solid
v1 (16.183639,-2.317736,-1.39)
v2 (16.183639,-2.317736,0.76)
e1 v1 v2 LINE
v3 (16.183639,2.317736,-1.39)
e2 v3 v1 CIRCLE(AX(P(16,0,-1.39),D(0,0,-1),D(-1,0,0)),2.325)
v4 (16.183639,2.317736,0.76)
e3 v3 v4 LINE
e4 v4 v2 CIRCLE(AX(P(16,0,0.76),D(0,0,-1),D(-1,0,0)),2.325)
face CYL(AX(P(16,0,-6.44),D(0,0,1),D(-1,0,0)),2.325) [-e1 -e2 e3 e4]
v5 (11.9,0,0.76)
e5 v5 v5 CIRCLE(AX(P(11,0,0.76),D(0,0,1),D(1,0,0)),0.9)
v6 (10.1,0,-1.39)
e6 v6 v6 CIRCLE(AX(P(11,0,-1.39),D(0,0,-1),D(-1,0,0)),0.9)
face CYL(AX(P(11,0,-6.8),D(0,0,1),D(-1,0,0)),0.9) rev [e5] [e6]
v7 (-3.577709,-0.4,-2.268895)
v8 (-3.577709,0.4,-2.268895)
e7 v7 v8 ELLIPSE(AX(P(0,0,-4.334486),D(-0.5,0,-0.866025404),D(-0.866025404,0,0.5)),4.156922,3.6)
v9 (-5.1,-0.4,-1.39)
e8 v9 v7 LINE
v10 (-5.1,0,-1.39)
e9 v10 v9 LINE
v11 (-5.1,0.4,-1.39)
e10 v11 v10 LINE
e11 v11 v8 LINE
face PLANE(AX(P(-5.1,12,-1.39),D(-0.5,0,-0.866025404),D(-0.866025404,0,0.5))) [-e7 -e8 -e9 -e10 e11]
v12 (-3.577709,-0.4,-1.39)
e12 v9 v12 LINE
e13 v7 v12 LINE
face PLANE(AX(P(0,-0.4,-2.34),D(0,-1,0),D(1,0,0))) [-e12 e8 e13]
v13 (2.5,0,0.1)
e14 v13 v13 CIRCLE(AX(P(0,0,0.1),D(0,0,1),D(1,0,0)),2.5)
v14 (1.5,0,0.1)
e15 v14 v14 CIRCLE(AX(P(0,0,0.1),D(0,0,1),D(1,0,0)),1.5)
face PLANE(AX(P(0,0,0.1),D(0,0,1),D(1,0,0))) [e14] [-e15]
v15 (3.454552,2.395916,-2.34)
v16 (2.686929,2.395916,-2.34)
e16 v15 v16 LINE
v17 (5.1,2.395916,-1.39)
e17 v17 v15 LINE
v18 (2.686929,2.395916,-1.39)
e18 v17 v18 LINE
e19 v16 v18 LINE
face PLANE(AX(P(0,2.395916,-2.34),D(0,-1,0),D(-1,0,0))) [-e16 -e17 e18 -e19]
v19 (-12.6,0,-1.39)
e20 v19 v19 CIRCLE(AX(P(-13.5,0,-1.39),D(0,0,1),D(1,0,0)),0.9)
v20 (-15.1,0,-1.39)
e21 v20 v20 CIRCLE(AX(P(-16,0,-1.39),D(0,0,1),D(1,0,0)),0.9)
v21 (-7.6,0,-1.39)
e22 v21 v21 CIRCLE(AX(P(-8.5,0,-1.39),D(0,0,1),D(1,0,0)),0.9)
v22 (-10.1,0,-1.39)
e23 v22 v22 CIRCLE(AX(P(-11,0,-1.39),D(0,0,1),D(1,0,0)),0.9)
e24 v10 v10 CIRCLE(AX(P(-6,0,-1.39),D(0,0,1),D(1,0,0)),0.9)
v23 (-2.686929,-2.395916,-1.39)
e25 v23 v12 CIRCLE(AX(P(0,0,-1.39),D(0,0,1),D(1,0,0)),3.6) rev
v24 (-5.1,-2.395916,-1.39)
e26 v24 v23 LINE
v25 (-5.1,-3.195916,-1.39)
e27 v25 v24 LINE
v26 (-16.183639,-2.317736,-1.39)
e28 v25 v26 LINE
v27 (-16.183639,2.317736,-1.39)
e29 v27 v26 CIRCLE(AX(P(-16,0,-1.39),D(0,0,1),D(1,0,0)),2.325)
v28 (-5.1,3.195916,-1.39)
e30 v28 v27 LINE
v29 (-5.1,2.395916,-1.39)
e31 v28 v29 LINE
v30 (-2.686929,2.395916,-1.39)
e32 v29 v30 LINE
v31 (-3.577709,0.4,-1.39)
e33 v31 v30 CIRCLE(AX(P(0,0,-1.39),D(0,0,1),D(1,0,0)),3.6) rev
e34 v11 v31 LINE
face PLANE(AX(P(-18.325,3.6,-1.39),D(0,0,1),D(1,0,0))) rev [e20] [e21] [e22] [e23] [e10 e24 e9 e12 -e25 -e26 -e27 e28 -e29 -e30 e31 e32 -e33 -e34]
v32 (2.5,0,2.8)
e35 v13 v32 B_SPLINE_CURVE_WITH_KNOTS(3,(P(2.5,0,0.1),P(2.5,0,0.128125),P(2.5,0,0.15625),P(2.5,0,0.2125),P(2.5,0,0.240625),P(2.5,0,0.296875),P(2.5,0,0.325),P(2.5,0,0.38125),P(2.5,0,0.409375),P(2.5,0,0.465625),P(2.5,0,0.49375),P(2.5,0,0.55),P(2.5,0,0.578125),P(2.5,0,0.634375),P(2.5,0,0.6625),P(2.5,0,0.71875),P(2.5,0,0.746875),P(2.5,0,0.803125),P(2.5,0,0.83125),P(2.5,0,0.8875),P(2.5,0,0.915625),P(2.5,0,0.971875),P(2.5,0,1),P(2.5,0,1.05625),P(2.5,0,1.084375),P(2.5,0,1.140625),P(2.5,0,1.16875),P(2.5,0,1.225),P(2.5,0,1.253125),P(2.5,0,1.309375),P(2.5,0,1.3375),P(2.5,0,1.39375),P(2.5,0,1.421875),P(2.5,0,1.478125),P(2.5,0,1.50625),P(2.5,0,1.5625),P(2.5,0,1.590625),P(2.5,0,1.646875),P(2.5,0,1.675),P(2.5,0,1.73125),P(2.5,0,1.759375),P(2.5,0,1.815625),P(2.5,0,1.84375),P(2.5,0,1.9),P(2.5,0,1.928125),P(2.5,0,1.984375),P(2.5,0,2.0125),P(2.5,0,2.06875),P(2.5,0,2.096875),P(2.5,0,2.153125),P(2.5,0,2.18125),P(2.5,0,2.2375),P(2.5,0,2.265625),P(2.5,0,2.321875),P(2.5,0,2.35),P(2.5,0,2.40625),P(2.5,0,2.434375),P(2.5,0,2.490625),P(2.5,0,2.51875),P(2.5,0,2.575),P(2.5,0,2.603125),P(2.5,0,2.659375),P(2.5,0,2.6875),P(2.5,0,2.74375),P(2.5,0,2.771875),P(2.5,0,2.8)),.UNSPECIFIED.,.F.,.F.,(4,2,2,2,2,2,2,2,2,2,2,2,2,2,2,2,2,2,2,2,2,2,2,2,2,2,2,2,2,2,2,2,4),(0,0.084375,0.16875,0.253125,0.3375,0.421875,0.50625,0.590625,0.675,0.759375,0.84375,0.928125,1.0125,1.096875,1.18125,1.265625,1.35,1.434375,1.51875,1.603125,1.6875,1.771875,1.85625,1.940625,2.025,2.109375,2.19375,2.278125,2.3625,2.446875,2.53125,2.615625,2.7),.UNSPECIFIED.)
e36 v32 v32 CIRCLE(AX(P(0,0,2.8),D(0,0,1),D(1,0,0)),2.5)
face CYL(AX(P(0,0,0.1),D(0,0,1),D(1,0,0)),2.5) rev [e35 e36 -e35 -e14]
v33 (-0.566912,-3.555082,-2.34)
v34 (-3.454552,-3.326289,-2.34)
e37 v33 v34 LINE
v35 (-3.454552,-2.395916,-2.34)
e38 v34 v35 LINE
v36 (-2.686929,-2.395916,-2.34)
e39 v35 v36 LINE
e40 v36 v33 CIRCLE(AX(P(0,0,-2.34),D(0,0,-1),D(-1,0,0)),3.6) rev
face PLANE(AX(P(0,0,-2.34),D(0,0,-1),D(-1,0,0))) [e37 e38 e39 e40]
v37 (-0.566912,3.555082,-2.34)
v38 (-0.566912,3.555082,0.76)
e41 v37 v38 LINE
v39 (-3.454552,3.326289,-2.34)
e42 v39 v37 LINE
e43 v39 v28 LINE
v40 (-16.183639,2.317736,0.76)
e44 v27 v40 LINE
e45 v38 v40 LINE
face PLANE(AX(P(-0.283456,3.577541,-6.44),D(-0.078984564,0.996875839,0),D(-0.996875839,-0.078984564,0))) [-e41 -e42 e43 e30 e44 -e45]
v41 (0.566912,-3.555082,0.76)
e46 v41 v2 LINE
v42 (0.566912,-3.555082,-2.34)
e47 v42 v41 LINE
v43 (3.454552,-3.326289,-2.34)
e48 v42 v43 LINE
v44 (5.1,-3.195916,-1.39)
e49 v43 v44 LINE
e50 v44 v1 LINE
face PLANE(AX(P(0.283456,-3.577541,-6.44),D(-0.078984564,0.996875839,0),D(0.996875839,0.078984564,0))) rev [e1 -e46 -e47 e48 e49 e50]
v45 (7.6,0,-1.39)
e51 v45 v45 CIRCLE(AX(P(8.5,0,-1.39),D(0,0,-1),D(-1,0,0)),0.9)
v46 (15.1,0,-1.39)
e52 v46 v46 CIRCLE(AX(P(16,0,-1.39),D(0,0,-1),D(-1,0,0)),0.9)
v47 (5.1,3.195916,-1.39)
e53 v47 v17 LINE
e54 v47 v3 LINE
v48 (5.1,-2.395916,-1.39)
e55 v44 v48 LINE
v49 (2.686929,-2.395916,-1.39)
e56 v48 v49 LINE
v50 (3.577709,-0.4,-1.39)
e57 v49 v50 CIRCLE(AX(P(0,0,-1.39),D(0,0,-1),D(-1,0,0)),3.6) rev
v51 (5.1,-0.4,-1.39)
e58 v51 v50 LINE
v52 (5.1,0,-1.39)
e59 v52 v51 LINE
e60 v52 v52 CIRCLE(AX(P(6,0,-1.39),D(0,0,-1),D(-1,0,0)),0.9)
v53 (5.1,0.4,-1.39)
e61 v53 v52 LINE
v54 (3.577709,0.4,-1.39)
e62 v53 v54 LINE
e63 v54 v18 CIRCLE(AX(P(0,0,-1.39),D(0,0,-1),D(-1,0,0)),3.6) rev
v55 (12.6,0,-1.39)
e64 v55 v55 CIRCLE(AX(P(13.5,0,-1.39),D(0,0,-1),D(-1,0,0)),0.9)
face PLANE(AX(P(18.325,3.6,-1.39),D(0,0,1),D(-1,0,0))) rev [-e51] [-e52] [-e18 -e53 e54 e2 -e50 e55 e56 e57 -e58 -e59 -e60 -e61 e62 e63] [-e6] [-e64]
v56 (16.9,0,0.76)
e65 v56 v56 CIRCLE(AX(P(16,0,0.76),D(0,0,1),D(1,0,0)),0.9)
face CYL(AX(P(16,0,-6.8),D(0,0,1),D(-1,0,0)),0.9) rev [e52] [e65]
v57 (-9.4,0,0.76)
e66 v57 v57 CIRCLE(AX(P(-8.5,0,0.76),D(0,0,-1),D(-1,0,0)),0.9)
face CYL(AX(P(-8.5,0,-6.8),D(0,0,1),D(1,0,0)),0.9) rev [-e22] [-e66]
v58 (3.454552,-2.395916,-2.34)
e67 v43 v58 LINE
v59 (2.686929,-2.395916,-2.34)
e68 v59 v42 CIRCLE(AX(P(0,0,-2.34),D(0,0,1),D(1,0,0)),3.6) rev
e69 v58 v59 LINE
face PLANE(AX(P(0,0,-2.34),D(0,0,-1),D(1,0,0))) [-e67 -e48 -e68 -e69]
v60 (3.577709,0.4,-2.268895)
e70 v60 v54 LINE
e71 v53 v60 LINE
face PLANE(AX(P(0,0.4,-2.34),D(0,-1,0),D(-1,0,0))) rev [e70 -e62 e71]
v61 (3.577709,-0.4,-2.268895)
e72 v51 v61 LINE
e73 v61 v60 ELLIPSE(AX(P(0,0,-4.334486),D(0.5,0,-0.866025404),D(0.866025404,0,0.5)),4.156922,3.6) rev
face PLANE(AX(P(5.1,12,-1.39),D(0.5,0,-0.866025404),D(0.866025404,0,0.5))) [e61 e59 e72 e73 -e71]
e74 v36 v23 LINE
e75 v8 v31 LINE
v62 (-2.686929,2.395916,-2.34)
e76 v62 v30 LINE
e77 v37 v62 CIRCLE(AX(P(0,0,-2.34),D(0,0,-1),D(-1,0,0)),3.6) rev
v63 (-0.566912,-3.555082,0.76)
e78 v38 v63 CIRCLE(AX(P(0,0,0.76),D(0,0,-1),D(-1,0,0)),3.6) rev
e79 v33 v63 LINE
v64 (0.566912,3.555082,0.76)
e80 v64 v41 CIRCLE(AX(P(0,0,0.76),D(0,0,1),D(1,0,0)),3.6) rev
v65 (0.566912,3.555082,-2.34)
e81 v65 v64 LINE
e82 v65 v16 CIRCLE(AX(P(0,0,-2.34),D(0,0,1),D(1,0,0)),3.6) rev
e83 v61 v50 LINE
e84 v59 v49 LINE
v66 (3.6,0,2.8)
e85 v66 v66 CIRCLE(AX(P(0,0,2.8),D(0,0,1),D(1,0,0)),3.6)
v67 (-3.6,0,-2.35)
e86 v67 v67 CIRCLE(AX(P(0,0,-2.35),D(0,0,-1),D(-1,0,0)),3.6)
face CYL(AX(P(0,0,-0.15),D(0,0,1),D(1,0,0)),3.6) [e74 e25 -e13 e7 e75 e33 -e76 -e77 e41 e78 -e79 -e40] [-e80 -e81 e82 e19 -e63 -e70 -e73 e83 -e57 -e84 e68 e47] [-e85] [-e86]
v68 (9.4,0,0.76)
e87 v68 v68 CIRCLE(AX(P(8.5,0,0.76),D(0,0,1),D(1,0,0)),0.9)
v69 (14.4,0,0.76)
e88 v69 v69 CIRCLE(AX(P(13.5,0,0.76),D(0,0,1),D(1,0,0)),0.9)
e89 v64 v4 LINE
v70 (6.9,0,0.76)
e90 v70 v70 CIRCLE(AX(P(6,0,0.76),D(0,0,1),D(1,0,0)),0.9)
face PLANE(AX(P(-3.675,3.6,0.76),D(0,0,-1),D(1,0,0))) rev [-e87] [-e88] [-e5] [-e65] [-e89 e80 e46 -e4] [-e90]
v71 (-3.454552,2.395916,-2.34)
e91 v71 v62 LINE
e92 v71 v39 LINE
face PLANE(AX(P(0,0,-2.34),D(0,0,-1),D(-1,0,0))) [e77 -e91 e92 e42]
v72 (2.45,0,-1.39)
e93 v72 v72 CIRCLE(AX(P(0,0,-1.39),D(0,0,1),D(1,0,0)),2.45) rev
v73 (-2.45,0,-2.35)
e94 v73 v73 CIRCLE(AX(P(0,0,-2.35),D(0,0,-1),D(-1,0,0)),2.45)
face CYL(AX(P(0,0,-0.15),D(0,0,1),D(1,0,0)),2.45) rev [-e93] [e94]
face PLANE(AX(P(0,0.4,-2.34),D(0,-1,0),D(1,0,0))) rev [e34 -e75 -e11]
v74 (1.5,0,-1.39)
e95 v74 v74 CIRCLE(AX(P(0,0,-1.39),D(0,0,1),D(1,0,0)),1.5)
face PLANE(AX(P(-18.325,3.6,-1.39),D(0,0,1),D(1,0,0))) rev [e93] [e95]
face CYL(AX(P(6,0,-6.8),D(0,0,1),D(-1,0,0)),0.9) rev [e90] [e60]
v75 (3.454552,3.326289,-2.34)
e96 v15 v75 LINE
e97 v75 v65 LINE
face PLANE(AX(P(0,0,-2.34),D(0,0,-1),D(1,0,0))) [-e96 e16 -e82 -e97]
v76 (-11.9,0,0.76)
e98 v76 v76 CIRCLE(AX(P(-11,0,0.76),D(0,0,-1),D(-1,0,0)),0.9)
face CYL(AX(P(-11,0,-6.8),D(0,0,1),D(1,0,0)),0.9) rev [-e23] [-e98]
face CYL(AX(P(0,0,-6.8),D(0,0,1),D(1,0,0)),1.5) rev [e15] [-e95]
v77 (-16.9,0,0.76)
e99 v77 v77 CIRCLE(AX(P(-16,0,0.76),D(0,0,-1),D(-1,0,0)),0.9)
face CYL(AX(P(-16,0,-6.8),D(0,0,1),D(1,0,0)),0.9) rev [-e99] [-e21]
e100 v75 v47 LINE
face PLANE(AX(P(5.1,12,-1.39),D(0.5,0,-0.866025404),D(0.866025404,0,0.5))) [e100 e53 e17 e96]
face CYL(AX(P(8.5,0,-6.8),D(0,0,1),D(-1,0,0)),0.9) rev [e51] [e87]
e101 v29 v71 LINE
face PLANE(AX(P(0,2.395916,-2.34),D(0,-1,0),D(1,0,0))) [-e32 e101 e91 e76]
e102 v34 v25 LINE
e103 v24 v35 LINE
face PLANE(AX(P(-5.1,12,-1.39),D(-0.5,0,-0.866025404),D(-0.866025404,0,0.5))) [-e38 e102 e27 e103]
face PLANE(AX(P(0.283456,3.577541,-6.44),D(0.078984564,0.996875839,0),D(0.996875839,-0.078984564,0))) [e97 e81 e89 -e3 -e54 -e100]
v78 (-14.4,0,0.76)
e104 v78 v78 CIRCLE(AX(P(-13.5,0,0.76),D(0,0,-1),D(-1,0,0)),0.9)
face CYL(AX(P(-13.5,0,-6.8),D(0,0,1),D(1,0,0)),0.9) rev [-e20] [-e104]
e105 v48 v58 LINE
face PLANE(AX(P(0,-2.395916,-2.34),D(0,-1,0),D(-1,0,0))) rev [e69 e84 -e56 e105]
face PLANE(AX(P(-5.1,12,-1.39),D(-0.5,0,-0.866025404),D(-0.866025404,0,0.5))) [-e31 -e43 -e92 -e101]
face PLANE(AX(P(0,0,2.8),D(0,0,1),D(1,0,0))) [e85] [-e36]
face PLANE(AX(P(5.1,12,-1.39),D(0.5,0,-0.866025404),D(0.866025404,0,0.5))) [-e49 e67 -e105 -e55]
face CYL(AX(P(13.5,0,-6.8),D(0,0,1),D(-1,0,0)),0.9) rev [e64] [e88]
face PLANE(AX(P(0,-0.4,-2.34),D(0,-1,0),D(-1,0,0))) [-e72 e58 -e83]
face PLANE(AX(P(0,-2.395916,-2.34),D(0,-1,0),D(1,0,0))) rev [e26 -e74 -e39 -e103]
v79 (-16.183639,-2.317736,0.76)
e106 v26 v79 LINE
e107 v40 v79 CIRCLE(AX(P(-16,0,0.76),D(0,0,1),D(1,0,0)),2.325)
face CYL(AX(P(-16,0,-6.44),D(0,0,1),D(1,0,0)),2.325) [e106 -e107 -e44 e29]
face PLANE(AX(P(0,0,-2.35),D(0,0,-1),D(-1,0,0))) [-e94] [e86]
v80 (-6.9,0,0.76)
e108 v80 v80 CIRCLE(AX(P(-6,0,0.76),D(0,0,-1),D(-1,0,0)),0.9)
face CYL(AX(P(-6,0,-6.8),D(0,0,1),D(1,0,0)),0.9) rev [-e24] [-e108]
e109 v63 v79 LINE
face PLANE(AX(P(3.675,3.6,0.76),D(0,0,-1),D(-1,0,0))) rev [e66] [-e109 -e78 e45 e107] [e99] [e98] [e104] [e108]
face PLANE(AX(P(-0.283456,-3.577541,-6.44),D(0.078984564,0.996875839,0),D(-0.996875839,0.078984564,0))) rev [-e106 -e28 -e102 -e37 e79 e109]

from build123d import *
from build123d.topology import SkipClean

# Parameters (mm, degrees)
RESSALTO_EXTRUS_O1_DEPTH      = 2.8
RESSALTO_EXTRUS_O1_DEPTH_BACK = 0.15
ESBO_O1_R                     = 3.6
ESBO_O1_R_2                   = 2.45
ESBO_O2_R                     = 2.5
ESBO_O2_R_2                   = 1
RESSALTO_EXTRUS_O2_DEPTH      = 0.5
ESBO_O3_R                     = 3.6
ESBO_O3_R_2                   = 2.45
RESSALTO_EXTRUS_O3_DEPTH      = 2.2
ESBO_O4_W                     = 22
ESBO_O4_H                     = 2.15
RESSALTO_EXTRUS_O4_DEPTH      = 3.6
ESBO_O5_W                     = 28.099055456
ESBO_O5_H                     = 12.161315405
CORTE_EXTRUS_O2_DEPTH         = 7.2
ESBO_O7_R                     = 2.5
CORTE_EXTRUS_O3_DEPTH         = 2.7
ESBO_O8_R                     = 1.5
ESBO_O8_R_2                   = 0.9
CORTE_EXTRUS_O4_DEPTH         = 6.9
RESSALTO_EXTRUS_O5_START      = 0.95
RESSALTO_EXTRUS_O5_DEPTH      = 0.95
CORTE_EXTRUS_O5_DEPTH         = 12
CORTE_EXTRUS_O5_DEPTH_BACK    = 4.95


with BuildPart() as part:
    # Esboço1 → Ressalto-extrusão1 (new, two sides: drawn at the far end of the back side and taken through both)
    with BuildSketch(Plane.XY.offset(-RESSALTO_EXTRUS_O1_DEPTH_BACK)):
        Circle(ESBO_O1_R)
        Circle(ESBO_O1_R_2, mode=Mode.SUBTRACT)
    extrude(amount=RESSALTO_EXTRUS_O1_DEPTH + RESSALTO_EXTRUS_O1_DEPTH_BACK)



with BuildPart() as body_2:
    # Esboço2 → Ressalto-extrusão2 (new body)
    with BuildSketch(Plane(origin=(0, 0, -0.15), x_dir=(-1, 0, 0), z_dir=(0, 0, -1))):
        Circle(ESBO_O2_R)
        Circle(ESBO_O2_R_2, mode=Mode.SUBTRACT)
    extrude(amount=RESSALTO_EXTRUS_O2_DEPTH)


with BuildPart() as part_1:
    add(part.part)

    add(body_2.part)  # Ressalto-extrusão3 merges body 2
    # Esboço3 → Ressalto-extrusão3 (add)
    with BuildSketch(Plane(origin=(0, 0, -0.15), x_dir=(-1, 0, 0), z_dir=(0, 0, -1))):
        Circle(ESBO_O3_R)
        Circle(ESBO_O3_R_2, mode=Mode.SUBTRACT)
    extrude(amount=RESSALTO_EXTRUS_O3_DEPTH)

    # Esboço4 → Ressalto-extrusão4 (add, symmetric)
    with BuildSketch(Plane(origin=(0, 0, 0), x_dir=(1, 0, 0), z_dir=(0, 1, 0))):
        with Locations((-7.325, 0.315)):
            Rectangle(ESBO_O4_W, ESBO_O4_H)
    extrude(amount=RESSALTO_EXTRUS_O4_DEPTH, both=True)

    # Esboço5 → Corte-extrusão2 (cut)
    with BuildSketch(Plane.XY.offset(0.76)):
        with Locations((-8.404041895, -0.464906197)):
            Rectangle(ESBO_O5_W, ESBO_O5_H)
        with BuildLine():
            ThreePointArc((0, -3.6), (-0.28434443, -3.588753021), (-0.566912184, -3.555082358))
            Line((-0.566912184, -3.555082358), (-16.183639111, -2.317736326))
            ThreePointArc((-16.183639111, -2.317736326), (-18.325, 0), (-16.183639111, 2.317736326))
            Line((-16.183639111, 2.317736326), (-0.566912184, 3.555082358))
            ThreePointArc((-0.566912184, 3.555082358), (-0.28434443, 3.588753021), (0, 3.6))
            ThreePointArc((0, 3.6), (3.6, 0), (0, -3.6))
        make_face(mode=Mode.SUBTRACT)
    extrude(amount=-CORTE_EXTRUS_O2_DEPTH, mode=Mode.SUBTRACT)

    # Esboço7 → Corte-extrusão3 (cut)
    with BuildSketch(Plane.XY.offset(2.8)):
        Circle(ESBO_O7_R)
    extrude(amount=-CORTE_EXTRUS_O3_DEPTH, mode=Mode.SUBTRACT)

    # Esboço8 → Corte-extrusão4 (cut, symmetric)
    with BuildSketch(Plane.XY.offset(0.1)):
        Circle(ESBO_O8_R)
        with Locations((-6, 0)):
            Circle(ESBO_O8_R_2)
        with Locations((-8.5, 0)):
            Circle(ESBO_O8_R_2)
        with Locations((-11, 0)):
            Circle(ESBO_O8_R_2)
        with Locations((-13.5, 0)):
            Circle(ESBO_O8_R_2)
        with Locations((-16, 0)):
            Circle(ESBO_O8_R_2)
    extrude(amount=CORTE_EXTRUS_O4_DEPTH, both=True, mode=Mode.SUBTRACT)

    # Esboço10 → Ressalto-extrusão5 (add)
    with SkipClean():  # the faces are left unmerged after this step: merging them gives an invalid solid
        with BuildSketch(Plane(origin=(0, 0, -1.39), x_dir=(-1, 0, 0), z_dir=(0, 0, -1)).offset(RESSALTO_EXTRUS_O5_START)):
            with BuildLine():
                Line((0.566912184, -3.555082358), (5.1, -3.195916302))
                Line((5.1, -3.195916302), (5.1, -2.395916302))
                Line((5.1, -2.395916302), (2.686928558, -2.395916302))
                ThreePointArc((2.686928558, -2.395916302), (1.727074515, -3.158672763), (0.566912184, -3.555082358))
            make_face()
            with BuildLine():
                ThreePointArc((0.566912184, 3.555082358), (1.727074515, 3.158672763), (2.686928558, 2.395916302))
                Line((2.686928558, 2.395916302), (5.1, 2.395916302))
                Line((5.1, 2.395916302), (5.1, 3.195916302))
                Line((5.1, 3.195916302), (0.566912184, 3.555082358))
            make_face()
            with BuildLine():
                ThreePointArc((3.577708764, 0.4), (3.6, 0), (3.577708764, -0.4))
                Line((3.577708764, -0.4), (5.193774225, -0.4))
                ThreePointArc((5.193774225, -0.4), (5.1, 0), (5.193774225, 0.4))
                Line((5.193774225, 0.4), (3.577708764, 0.4))
            make_face()
        extrude(amount=-RESSALTO_EXTRUS_O5_DEPTH)

    # Esboço11 → Corte-extrusão5 (cut, two sides: drawn at the far end of the back side and taken through both)
    with BuildSketch(Plane(origin=(0, 0, 0), x_dir=(1, 0, 0), z_dir=(0, 1, 0)).offset(-CORTE_EXTRUS_O5_DEPTH_BACK)):
        Polygon((-5.1, 1.39), (-2.045555334, 3.15348445), (-5.859008957, 3.15348445), (-5.859008957, 1.39), align=None)
    extrude(amount=CORTE_EXTRUS_O5_DEPTH + CORTE_EXTRUS_O5_DEPTH_BACK, mode=Mode.SUBTRACT)

    # Espelhar20: part across plane


with BuildPart() as part_2:
    add(part_1.part)
    add(part_1.part.mirror(Plane.ZY))


solid = part_2.part
